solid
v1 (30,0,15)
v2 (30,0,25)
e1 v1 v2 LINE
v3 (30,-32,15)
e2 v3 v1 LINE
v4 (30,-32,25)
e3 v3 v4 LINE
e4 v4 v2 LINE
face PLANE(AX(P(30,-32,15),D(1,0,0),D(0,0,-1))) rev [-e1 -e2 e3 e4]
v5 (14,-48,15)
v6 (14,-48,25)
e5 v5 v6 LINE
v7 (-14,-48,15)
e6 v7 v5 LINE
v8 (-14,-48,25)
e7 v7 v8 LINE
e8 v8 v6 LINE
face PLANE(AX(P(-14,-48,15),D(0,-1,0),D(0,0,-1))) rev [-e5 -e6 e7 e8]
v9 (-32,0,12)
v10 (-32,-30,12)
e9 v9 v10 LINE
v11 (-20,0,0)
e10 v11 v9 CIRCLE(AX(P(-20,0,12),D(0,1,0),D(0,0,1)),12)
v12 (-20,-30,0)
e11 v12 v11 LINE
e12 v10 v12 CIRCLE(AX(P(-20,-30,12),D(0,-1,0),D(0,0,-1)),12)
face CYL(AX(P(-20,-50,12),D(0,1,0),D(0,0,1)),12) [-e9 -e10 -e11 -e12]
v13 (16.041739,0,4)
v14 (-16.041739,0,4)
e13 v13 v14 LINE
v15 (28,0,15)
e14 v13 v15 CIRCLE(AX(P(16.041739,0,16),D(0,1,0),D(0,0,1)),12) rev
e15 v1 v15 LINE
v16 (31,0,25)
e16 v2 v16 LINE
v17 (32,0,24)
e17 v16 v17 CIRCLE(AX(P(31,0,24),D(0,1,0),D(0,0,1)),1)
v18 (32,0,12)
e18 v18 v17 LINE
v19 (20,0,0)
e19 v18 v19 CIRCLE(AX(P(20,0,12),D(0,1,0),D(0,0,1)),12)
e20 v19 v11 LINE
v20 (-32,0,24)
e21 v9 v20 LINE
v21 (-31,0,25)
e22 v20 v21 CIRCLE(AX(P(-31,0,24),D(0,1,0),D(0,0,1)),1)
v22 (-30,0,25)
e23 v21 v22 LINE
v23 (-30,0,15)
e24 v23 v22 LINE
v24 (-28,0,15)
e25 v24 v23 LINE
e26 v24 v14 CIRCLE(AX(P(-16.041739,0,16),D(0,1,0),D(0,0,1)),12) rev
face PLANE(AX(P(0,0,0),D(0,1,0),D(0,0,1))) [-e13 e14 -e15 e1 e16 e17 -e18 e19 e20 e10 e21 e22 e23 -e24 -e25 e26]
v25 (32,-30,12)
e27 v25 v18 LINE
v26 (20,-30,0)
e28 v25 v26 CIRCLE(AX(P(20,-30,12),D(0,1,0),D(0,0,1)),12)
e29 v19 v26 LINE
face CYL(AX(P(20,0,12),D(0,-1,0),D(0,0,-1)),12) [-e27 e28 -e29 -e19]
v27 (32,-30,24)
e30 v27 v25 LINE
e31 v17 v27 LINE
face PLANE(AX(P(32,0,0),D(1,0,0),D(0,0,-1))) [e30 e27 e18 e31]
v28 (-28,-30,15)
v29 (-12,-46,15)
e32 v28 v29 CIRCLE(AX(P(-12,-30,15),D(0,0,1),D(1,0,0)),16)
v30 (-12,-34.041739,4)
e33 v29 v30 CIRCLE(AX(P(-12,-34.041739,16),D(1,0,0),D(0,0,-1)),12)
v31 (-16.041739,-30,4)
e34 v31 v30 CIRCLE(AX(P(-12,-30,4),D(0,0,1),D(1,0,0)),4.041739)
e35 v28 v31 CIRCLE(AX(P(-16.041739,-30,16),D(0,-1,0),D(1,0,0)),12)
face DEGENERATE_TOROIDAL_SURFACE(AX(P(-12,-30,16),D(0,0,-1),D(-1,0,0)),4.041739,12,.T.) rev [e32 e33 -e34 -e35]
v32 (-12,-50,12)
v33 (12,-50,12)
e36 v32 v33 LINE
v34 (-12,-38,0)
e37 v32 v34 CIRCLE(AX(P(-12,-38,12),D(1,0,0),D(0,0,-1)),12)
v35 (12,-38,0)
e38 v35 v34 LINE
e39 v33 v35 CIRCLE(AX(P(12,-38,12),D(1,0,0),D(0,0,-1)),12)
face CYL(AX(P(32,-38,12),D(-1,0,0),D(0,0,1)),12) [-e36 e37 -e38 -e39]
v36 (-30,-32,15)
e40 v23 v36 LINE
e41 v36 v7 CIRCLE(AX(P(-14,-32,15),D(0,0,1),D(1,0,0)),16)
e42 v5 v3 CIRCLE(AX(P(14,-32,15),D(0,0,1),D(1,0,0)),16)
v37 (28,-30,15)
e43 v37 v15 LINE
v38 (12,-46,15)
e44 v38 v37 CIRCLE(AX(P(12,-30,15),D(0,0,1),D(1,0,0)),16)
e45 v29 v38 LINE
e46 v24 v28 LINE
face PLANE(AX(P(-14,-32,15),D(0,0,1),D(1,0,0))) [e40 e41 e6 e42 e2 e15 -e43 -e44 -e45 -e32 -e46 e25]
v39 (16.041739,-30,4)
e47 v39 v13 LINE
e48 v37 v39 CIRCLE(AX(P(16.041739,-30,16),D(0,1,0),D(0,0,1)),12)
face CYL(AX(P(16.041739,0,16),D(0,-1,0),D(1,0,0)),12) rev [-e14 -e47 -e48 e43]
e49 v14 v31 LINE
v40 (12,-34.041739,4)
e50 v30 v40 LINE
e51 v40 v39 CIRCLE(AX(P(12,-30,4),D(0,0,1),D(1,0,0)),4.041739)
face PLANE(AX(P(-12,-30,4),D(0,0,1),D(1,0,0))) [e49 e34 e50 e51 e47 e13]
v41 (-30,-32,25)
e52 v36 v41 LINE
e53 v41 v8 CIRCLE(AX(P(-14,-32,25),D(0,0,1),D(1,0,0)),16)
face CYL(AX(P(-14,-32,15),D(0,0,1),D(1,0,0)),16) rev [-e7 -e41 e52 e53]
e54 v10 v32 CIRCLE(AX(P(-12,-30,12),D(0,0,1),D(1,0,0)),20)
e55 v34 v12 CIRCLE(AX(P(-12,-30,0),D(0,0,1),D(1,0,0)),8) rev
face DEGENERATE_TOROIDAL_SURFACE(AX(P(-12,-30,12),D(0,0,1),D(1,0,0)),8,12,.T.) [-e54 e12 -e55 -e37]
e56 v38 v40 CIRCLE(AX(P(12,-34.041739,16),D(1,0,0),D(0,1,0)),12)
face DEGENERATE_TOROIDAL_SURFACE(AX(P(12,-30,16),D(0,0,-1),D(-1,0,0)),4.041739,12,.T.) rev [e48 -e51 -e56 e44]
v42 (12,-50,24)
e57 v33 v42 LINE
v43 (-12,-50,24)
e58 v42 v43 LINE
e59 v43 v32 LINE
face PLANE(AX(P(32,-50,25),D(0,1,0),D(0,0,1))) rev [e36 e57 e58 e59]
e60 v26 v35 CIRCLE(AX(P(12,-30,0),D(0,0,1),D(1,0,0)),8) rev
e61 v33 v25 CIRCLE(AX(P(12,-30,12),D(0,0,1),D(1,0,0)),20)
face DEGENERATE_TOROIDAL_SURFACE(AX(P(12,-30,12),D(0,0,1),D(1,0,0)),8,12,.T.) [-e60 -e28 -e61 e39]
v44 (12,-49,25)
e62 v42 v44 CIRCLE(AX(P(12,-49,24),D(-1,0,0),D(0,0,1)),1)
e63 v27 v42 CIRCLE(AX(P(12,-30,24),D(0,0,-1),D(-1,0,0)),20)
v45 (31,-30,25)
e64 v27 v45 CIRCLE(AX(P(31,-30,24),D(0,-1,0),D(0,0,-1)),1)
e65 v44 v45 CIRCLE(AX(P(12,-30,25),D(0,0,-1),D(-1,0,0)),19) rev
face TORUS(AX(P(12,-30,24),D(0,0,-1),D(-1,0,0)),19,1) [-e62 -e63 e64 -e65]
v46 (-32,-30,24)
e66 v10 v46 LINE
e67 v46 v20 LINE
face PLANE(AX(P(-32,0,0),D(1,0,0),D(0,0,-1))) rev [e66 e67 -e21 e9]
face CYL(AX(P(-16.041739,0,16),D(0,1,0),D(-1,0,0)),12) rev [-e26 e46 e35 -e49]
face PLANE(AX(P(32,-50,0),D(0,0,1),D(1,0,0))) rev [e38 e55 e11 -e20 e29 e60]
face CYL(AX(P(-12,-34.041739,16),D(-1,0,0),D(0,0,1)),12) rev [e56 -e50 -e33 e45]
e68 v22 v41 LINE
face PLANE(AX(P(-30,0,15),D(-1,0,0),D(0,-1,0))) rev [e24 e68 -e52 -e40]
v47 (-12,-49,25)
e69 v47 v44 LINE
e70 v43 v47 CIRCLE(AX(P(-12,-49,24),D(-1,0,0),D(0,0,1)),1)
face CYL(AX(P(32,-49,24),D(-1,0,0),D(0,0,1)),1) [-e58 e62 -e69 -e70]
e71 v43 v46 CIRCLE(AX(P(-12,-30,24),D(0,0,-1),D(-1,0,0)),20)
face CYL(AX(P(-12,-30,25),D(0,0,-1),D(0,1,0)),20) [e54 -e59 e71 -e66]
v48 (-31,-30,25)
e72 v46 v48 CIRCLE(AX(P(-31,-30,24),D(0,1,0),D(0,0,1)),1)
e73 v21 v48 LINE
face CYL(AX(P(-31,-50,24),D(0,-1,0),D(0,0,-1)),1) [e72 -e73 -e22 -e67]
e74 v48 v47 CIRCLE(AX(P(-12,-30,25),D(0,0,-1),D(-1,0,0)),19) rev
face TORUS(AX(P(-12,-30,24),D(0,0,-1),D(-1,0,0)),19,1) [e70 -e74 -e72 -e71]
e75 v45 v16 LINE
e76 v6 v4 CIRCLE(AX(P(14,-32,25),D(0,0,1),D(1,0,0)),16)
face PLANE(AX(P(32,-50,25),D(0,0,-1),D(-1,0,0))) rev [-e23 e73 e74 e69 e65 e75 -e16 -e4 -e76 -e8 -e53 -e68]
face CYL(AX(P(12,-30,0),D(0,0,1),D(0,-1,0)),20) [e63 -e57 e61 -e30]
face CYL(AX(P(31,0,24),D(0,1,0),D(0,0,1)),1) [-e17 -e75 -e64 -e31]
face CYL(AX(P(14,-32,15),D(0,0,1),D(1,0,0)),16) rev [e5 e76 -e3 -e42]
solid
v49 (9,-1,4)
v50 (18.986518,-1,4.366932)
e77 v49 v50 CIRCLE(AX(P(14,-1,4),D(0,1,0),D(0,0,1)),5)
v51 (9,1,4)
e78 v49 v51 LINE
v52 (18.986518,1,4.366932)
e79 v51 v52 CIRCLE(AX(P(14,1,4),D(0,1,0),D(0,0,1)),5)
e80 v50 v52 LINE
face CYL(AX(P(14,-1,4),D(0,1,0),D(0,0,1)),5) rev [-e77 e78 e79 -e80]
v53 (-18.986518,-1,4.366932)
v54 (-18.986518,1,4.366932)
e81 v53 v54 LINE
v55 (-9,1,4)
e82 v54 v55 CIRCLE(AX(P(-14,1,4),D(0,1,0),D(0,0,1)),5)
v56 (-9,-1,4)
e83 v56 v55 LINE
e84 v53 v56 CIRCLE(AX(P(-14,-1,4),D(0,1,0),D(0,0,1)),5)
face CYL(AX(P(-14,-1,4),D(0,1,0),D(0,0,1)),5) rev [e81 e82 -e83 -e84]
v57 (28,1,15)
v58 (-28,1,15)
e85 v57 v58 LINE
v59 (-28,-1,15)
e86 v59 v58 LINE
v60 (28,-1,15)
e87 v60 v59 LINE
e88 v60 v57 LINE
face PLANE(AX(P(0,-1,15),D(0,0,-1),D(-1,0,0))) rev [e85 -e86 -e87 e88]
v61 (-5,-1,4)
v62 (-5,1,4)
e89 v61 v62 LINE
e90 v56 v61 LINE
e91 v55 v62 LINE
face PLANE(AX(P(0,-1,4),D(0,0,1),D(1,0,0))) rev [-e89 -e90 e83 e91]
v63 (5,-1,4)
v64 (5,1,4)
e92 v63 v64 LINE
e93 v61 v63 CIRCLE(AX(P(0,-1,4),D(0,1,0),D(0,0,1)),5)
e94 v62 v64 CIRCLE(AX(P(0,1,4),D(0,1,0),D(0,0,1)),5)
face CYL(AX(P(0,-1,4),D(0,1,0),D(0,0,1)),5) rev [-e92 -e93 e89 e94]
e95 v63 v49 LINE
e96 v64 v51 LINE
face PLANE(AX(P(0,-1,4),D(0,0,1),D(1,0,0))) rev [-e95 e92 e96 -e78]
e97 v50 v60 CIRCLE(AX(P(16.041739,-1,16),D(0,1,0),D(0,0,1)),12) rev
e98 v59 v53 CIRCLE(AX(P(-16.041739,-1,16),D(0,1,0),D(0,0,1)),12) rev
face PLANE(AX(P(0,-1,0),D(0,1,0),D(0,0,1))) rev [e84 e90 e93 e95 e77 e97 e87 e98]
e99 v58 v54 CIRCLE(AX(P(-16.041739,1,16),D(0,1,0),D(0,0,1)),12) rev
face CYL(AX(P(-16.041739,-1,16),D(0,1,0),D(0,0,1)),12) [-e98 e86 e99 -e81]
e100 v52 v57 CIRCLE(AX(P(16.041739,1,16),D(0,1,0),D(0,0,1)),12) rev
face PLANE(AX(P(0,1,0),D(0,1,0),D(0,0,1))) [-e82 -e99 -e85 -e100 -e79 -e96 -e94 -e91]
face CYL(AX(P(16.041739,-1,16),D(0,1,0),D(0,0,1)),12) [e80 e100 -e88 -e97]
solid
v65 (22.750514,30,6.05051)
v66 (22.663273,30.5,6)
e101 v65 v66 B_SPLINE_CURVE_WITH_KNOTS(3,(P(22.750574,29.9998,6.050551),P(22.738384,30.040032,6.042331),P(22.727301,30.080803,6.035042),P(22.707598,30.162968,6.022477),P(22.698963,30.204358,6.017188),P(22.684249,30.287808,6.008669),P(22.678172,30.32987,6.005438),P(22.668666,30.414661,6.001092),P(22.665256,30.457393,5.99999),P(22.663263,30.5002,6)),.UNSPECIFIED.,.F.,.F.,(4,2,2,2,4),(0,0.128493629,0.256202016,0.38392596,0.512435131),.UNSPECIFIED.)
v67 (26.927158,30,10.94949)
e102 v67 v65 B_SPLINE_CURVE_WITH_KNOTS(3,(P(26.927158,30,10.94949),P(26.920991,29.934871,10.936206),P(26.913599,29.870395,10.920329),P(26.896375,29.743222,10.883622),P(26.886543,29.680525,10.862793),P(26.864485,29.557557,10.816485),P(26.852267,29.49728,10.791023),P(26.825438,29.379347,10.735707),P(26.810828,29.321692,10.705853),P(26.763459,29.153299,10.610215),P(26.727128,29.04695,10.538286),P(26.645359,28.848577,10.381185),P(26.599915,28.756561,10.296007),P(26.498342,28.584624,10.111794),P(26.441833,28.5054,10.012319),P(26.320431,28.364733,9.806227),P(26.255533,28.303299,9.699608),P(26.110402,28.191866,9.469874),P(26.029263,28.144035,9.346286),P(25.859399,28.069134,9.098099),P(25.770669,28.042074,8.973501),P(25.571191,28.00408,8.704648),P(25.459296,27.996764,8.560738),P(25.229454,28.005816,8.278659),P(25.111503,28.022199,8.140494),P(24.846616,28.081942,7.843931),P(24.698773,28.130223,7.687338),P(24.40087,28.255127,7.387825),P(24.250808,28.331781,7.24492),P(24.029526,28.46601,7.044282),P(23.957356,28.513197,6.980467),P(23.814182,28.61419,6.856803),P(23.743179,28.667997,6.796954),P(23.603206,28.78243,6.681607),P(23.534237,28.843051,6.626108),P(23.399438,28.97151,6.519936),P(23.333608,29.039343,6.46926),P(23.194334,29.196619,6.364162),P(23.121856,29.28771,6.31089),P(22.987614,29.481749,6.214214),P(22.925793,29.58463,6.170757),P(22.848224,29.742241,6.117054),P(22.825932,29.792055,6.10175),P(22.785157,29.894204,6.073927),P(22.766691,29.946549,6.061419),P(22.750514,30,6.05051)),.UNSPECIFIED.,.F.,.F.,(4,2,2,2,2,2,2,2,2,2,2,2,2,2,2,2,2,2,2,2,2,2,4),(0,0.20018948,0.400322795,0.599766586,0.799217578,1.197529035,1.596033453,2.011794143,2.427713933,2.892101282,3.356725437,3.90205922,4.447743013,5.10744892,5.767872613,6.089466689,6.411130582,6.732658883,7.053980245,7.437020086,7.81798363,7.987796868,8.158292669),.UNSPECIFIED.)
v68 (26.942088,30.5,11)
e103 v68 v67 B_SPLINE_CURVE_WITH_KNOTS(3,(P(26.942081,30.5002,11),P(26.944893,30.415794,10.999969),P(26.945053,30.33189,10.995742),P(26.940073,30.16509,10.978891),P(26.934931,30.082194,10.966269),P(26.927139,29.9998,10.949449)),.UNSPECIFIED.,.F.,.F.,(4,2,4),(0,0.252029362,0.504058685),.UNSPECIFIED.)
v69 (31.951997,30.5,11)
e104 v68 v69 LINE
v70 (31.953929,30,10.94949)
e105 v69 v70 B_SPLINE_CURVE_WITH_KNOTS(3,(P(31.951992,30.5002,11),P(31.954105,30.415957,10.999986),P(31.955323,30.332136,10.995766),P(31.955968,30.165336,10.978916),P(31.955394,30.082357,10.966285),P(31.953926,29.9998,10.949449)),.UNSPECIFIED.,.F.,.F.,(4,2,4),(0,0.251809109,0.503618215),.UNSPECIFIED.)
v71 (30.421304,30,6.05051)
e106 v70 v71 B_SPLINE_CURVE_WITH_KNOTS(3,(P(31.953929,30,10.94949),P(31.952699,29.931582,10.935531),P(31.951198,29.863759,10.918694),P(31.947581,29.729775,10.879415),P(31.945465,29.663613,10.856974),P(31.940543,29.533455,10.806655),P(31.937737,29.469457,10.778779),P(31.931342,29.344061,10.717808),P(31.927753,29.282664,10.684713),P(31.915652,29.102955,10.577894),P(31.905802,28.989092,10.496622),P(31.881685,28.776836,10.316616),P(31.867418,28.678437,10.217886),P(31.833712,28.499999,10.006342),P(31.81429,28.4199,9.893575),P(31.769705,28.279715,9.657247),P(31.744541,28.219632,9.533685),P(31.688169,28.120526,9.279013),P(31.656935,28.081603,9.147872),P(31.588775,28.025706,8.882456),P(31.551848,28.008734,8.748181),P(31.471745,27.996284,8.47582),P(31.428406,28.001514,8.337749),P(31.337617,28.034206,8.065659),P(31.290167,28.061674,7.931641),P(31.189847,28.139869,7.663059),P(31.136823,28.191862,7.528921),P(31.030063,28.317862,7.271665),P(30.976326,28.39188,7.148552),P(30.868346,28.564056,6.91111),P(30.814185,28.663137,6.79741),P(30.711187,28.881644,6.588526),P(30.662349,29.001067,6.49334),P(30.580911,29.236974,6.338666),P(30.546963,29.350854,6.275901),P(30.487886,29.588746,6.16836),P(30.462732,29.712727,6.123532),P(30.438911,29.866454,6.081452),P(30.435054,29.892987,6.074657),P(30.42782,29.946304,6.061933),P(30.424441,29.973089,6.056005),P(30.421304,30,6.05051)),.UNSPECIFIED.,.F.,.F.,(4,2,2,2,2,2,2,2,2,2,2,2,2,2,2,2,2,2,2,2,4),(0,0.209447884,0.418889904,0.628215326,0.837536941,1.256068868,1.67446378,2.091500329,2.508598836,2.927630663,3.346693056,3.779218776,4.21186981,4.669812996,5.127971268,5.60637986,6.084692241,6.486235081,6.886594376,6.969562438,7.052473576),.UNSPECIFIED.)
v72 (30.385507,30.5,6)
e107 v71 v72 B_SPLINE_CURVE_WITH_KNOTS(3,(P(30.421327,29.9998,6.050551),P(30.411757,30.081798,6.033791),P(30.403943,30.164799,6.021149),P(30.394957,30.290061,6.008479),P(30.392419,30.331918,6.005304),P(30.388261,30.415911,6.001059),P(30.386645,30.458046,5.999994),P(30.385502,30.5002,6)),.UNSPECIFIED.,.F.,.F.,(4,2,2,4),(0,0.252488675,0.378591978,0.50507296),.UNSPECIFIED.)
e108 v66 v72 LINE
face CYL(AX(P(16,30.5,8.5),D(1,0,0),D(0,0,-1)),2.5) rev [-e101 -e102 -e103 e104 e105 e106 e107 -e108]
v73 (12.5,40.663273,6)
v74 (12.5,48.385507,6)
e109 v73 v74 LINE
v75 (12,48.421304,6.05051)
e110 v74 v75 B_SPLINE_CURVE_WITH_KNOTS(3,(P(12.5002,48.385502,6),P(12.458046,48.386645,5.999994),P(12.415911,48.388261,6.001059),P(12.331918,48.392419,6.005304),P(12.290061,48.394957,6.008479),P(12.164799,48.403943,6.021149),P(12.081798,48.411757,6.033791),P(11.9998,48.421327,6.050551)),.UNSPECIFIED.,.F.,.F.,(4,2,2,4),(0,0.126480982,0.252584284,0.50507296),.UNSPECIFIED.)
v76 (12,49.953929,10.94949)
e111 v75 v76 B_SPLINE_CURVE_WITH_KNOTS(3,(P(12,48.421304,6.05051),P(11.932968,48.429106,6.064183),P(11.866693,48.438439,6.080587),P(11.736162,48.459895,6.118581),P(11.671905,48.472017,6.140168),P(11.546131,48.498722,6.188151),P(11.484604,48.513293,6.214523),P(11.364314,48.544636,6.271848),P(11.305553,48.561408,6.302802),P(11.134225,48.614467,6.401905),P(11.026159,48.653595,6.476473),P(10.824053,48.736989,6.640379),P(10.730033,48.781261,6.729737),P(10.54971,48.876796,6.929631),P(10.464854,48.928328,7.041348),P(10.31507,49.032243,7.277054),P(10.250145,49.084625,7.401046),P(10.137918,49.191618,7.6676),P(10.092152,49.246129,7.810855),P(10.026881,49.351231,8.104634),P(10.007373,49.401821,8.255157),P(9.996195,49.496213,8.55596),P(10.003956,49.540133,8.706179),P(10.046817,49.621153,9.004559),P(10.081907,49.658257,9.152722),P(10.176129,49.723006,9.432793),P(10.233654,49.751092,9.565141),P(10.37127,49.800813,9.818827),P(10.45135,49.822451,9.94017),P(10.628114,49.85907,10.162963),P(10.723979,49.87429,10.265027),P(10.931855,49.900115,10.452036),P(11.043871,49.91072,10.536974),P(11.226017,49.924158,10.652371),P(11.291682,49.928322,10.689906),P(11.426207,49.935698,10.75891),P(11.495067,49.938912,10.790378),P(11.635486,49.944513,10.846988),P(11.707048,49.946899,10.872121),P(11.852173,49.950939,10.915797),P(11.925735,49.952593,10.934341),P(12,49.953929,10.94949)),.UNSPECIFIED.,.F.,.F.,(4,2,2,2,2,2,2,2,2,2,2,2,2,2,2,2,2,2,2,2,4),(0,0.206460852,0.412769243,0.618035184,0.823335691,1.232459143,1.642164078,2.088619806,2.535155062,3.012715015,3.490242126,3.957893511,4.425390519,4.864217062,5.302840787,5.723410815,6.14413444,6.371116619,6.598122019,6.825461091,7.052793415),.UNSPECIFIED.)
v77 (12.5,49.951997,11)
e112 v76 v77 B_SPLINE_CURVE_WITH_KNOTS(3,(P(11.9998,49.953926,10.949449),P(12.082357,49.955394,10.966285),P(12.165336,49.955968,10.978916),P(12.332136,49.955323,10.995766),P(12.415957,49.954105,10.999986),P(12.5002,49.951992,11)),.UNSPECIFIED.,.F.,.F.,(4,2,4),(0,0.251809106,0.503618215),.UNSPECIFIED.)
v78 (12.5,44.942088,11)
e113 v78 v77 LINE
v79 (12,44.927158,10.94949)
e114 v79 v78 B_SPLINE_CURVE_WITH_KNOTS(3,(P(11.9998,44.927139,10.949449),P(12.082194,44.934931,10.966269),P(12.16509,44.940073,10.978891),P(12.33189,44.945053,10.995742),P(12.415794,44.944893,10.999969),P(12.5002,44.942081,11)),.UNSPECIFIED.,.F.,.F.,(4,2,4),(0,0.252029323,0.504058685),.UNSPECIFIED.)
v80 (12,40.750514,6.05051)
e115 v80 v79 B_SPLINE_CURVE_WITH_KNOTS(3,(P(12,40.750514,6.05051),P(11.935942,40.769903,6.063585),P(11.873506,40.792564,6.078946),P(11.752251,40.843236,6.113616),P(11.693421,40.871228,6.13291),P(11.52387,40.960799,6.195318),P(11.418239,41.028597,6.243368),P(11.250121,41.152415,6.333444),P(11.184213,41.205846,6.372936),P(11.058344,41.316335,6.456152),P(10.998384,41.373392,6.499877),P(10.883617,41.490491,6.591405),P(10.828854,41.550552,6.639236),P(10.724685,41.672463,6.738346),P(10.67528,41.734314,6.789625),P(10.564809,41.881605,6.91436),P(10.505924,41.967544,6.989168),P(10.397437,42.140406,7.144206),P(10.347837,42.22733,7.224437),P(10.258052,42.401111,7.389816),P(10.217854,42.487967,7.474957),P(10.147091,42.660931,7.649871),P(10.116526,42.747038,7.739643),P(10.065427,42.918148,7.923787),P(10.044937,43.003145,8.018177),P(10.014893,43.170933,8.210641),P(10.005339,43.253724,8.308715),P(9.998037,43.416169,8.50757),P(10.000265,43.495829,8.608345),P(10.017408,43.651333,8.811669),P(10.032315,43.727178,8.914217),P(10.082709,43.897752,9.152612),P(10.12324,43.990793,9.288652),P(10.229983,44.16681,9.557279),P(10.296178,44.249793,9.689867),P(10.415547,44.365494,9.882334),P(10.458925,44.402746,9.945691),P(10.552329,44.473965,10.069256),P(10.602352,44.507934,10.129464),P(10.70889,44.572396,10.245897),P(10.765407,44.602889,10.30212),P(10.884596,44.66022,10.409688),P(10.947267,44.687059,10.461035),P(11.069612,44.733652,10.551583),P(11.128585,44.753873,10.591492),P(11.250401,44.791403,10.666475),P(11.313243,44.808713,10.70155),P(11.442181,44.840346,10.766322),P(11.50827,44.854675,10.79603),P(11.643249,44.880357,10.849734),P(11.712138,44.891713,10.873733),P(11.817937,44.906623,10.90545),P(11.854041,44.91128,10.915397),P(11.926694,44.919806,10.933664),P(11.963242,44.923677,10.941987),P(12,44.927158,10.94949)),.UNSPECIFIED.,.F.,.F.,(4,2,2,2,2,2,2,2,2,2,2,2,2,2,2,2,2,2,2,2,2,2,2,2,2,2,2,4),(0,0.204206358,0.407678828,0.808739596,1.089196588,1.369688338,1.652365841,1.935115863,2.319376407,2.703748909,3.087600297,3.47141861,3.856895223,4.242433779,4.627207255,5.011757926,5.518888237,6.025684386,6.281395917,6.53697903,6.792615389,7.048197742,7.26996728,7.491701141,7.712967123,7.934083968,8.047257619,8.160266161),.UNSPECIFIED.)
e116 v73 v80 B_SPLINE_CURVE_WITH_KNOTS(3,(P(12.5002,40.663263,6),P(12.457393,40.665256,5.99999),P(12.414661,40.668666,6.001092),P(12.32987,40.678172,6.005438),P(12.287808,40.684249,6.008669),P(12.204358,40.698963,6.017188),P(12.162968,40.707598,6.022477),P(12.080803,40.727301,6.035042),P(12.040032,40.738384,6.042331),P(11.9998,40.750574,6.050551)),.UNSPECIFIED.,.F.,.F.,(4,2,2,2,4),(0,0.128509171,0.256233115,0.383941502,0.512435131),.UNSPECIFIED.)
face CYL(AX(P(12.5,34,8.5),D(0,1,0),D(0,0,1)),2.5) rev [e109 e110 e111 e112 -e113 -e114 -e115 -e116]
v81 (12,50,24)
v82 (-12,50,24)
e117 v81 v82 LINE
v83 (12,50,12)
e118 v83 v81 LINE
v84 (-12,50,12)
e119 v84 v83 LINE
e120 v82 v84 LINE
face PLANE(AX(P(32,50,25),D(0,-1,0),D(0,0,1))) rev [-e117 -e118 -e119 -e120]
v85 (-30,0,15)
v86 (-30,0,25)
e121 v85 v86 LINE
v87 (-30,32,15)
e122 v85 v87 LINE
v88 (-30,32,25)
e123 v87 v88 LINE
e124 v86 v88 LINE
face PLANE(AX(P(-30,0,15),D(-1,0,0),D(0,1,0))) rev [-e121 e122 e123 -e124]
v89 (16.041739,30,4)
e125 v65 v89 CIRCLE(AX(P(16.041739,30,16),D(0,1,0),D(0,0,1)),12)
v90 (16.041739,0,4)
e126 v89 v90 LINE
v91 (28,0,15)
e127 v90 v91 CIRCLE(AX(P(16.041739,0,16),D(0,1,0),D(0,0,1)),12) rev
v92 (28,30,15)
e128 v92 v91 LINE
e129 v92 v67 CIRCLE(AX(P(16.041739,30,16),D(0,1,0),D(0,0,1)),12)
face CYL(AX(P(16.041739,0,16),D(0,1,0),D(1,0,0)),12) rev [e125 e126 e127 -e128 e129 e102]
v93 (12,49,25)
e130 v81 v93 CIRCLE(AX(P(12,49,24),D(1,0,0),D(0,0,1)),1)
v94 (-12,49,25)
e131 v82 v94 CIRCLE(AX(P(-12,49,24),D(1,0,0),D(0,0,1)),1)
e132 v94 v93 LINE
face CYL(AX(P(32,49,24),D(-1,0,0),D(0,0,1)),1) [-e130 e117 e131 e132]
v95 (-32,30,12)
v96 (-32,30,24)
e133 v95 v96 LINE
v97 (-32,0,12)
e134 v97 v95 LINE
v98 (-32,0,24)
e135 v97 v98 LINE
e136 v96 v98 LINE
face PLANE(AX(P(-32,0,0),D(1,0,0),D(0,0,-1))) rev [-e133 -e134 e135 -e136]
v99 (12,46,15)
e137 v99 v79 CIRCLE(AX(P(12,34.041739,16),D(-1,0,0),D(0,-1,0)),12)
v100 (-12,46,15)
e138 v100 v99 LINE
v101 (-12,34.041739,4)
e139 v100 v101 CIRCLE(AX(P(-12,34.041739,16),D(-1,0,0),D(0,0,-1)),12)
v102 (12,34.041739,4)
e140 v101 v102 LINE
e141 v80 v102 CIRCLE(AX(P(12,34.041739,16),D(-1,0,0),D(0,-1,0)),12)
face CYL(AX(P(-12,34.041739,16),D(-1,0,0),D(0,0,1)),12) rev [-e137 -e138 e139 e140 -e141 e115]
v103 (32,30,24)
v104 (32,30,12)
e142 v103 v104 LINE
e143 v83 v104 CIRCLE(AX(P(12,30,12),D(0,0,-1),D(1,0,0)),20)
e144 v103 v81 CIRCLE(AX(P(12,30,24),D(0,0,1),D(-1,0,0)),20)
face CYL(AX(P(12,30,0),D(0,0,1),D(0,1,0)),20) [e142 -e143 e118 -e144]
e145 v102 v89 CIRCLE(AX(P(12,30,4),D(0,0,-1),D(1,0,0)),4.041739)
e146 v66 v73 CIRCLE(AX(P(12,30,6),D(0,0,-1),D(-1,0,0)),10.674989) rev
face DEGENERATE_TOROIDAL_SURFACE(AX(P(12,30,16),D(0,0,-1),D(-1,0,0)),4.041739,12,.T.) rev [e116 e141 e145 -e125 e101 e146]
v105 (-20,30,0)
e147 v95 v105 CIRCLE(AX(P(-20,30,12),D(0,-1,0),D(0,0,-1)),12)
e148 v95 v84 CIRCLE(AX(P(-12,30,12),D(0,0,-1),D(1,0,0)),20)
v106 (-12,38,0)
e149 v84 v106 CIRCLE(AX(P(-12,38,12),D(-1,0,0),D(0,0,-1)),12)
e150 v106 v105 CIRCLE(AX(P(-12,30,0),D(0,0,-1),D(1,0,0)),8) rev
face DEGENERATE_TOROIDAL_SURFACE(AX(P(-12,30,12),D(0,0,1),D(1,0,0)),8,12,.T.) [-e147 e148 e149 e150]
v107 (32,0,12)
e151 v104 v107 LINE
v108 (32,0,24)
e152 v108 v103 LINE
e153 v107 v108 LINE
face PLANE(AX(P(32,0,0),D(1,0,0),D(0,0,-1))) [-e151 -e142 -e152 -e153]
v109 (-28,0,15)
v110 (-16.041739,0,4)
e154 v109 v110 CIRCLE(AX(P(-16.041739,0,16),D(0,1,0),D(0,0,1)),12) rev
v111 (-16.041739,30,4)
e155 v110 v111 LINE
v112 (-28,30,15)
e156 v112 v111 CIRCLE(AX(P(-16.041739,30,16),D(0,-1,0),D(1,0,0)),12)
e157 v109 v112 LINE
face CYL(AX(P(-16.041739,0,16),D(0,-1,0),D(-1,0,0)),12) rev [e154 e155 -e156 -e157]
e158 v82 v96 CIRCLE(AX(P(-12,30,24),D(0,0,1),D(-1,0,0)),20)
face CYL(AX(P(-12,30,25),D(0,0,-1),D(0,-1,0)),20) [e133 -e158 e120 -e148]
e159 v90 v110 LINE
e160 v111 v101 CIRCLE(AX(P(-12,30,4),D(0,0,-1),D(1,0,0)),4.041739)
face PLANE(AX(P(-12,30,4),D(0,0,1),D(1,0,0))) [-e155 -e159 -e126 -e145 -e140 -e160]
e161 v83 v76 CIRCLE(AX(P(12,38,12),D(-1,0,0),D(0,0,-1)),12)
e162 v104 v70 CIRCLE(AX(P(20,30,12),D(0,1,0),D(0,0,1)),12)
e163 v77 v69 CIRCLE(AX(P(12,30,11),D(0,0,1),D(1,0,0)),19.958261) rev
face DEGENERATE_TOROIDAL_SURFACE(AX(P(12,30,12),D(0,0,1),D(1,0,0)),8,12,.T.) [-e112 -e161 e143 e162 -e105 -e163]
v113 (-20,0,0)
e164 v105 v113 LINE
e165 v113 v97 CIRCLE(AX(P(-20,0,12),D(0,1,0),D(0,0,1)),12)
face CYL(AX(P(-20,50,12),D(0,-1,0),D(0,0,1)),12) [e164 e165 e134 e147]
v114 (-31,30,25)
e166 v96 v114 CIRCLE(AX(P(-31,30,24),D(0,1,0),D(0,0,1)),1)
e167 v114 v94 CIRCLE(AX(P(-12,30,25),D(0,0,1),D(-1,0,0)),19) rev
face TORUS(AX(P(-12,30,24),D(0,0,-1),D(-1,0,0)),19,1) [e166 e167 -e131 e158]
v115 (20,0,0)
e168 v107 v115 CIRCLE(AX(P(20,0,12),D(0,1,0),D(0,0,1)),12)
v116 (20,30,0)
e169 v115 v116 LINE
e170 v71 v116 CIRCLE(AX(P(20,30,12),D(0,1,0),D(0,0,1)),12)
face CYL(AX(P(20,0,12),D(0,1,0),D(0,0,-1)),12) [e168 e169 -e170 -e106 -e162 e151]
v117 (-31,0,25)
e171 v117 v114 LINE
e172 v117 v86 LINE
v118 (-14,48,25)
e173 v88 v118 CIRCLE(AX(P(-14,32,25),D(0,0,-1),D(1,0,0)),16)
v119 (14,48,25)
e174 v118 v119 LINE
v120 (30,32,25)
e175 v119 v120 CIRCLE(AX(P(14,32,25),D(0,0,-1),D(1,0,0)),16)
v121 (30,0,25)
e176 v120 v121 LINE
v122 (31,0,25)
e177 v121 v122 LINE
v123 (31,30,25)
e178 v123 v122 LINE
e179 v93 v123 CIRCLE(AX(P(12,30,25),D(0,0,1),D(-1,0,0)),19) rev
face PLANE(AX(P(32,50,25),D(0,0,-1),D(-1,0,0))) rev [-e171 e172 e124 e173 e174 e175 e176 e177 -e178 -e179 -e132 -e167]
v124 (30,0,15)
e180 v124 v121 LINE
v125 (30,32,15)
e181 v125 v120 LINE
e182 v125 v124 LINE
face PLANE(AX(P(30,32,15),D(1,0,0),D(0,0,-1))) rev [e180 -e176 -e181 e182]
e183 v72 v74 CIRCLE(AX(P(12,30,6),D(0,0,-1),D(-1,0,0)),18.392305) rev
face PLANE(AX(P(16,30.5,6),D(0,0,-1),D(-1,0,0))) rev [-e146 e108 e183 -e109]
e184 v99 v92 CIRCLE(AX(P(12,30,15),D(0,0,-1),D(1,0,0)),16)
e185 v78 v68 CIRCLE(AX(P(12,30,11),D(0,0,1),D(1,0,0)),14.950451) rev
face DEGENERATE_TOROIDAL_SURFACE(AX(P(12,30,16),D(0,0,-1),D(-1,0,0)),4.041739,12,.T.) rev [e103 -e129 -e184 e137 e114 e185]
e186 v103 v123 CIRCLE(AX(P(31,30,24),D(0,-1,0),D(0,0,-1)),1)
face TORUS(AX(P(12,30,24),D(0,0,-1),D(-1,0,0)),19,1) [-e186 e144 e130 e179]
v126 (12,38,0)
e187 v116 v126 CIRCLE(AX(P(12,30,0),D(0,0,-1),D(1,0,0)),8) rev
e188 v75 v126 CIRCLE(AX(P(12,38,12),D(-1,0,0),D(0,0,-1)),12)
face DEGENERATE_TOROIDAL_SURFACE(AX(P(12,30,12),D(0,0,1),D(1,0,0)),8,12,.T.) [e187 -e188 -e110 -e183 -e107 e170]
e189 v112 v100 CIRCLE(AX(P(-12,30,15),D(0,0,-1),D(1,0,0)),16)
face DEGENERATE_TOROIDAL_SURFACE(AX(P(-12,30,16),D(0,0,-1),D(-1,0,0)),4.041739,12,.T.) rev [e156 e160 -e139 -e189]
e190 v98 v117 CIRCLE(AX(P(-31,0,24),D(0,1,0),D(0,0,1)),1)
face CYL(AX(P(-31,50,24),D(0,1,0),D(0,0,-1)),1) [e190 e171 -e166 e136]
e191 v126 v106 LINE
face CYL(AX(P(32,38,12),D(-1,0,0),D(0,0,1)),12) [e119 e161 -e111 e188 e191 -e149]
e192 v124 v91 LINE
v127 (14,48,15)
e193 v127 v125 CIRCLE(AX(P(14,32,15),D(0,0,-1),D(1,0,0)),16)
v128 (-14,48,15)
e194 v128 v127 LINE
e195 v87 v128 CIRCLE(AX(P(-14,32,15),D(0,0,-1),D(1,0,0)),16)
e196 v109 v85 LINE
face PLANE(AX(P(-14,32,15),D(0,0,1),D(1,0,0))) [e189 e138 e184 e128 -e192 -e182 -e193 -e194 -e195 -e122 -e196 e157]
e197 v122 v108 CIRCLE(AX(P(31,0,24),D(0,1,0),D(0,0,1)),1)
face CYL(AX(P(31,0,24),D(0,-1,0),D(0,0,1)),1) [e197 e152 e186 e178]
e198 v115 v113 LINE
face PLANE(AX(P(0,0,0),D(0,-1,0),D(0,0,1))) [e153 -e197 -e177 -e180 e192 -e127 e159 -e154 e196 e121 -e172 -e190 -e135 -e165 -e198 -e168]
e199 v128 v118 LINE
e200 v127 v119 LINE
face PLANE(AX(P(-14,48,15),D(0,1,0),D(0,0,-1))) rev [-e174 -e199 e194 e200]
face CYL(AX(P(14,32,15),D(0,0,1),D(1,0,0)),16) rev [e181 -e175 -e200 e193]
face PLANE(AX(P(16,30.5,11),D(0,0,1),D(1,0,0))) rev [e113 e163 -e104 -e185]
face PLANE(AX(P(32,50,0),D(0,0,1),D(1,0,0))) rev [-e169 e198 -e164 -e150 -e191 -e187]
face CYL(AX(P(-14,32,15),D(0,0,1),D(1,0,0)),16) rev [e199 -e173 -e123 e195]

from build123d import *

# Parameters (mm, degrees)
SKETCH2_W           = 100
SKETCH2_H           = 25
BOSS_EXTRUDE3_DEPTH = 32
CUT_EXTRUDE1_DEPTH  = 10
CUT_EXTRUDE2_DEPTH  = 11
FILLET1_R           = 12
FILLET2_R           = 20
FILLET3_R           = 12
FILLET13_R          = 1
BOSS_EXTRUDE4_DEPTH = 1
CUT_EXTRUDE3_DEPTH  = 16
CUT_EXTRUDE4_DEPTH  = 16


with BuildPart() as part:
    # Sketch2 → Boss-Extrude3 (new, symmetric)
    with BuildSketch(Plane.YZ):
        with Locations((0, 12.5)):
            Rectangle(SKETCH2_W, SKETCH2_H)
    extrude(amount=BOSS_EXTRUDE3_DEPTH, both=True)

    # Sketch3 → Cut-Extrude1 (cut)
    with BuildSketch(Plane.XY.offset(25)):
        with BuildLine():
            Line((-30, 0), (-30, -32))
            ThreePointArc((-30, -32), (-25.313708499, -43.313708499), (-14, -48))
            Line((-14, -48), (14, -48))
            ThreePointArc((14, -48), (25.313708499, -43.313708499), (30, -32))
            Line((30, -32), (30, 0))
            Line((30, 0), (-30, 0))
        make_face()
    extrude(amount=-CUT_EXTRUDE1_DEPTH, mode=Mode.SUBTRACT)

    # Sketch4 → Cut-Extrude2 (cut)
    with BuildSketch(Plane.XY.offset(15)):
        with BuildLine():
            Line((-28, 0), (28, 0))
            Line((28, 0), (28, -30))
            ThreePointArc((28, -30), (23.313708499, -41.313708499), (12, -46))
            Line((12, -46), (-12, -46))
            ThreePointArc((-12, -46), (-23.313708499, -41.313708499), (-28, -30))
            Line((-28, -30), (-28, 0))
        make_face()
    extrude(amount=-CUT_EXTRUDE2_DEPTH, mode=Mode.SUBTRACT)

    # SurfaceCut2
    split(bisect_by=Plane(origin=(0, 0, 0), x_dir=(-1, 0, 0), z_dir=(0, 1, 0)), keep=Keep.BOTTOM)

    # Fillet1
    # the kernel refuses this fillet: 12 mm, written as the material it adds along each edge
    with BuildSketch(Plane(origin=(-28, -30, 4), x_dir=(1, 0, 0), z_dir=(0, 1, 0))) as fillet1_piece_1:
        with BuildLine():
            CenterArc((11.958260743, -12), FILLET1_R, 90, 85.219808153)
            Line((0, -11), (-0.239165215, -10.98))
            ThreePointArc((-0.239165215, -10.98), (-0.24, -5.5), (-0.24, 0))
            Line((-0.24, 0), (0, 0.24))
            Line((0, 0.24), (11.958260743, 0.24))
            Line((11.958260743, 0.24), (11.958260743, 0))
        make_face()
    extrude(amount=30)
    with BuildSketch(Plane(origin=(28, 0, 4), x_dir=(0, 0, 1), z_dir=(0, -1, 0))) as fillet1_piece_2:
        with BuildLine():
            CenterArc((12, 11.958260743), FILLET1_R, 180, 85.219808153)
            Line((0, 11.958260743), (-0.24, 11.958260743))
            Line((-0.24, 11.958260743), (-0.24, 0))
            Line((-0.24, 0), (0, -0.24))
            ThreePointArc((0, -0.24), (5.5, -0.24), (10.98, -0.239165215))
            Line((10.98, -0.239165215), (11, 0))
        make_face()
    extrude(amount=30)
    with BuildSketch(Plane(origin=(12, -30, 4), x_dir=(1, 0, 0), z_dir=(0, 1, 0))) as fillet1_piece_3:
        with BuildLine():
            CenterArc((4.041739257, -12), FILLET1_R, 4.780191847, 85.219808153)
            Line((16, -11), (16.239165215, -10.98))
            ThreePointArc((16.239165215, -10.98), (16.24, -5.5), (16.24, 0))
            Line((16.24, 0), (16, 0.24))
            Line((16, 0.24), (4.041739257, 0.24))
            Line((4.041739257, 0.24), (4.041739257, 0))
        make_face()
    revolve(axis=Axis((12, -30, 4), (0, 0, -1)), revolution_arc=90)
    with BuildSketch(Plane(origin=(12, -46, 4), x_dir=(0, 1, 0), z_dir=(-1, 0, 0))) as fillet1_piece_4:
        with BuildLine():
            CenterArc((11.958260743, -12), FILLET1_R, 90, 85.219808153)
            Line((0, -11), (-0.239165215, -10.98))
            ThreePointArc((-0.239165215, -10.98), (-0.24, -5.5), (-0.24, 0))
            Line((-0.24, 0), (0, 0.24))
            Line((0, 0.24), (11.958260743, 0.24))
            Line((11.958260743, 0.24), (11.958260743, 0))
        make_face()
    extrude(amount=24)
    with BuildSketch(Plane(origin=(-12, -30, 4), x_dir=(0, -1, 0), z_dir=(1, 0, 0))) as fillet1_piece_5:
        with BuildLine():
            CenterArc((4.041739257, -12), FILLET1_R, 4.780191847, 85.219808153)
            Line((16, -11), (16.239165215, -10.98))
            ThreePointArc((16.239165215, -10.98), (16.24, -5.5), (16.24, 0))
            Line((16.24, 0), (16, 0.24))
            Line((16, 0.24), (4.041739257, 0.24))
            Line((4.041739257, 0.24), (4.041739257, 0))
        make_face()
    revolve(axis=Axis((-12, -30, 4), (0, 0, -1)), revolution_arc=90)

    # Fillet2
    fillet2_edges = [part.edges().sort_by_distance(p)[0] for p in [
        (32, -50, 12.5),
        (-32, -50, 12.5),
    ]]
    fillet(fillet2_edges, radius=FILLET2_R)

    # Fillet3
    fillet3_edges = [part.edges().sort_by_distance(p)[0] for p in [
        (0, -50, 0),
        (32, -15, 0),
        (-32, -15, 0),
        (26.142135624, -44.142135624, 0),
        (-26.142135624, -44.142135624, 0),
    ]]
    fillet(fillet3_edges, radius=FILLET3_R)

    # Fillet13
    fillet13_edges = [part.edges().sort_by_distance(p)[0] for p in [
        (-32, -15, 25),
        (32, -15, 25),
        (0, -50, 25),
        (26.142135624, -44.142135624, 25),
        (-26.142135624, -44.142135624, 25),
    ]]
    fillet(fillet13_edges, radius=FILLET13_R)


with BuildPart() as body_2:
    # Sketch7 → Boss-Extrude4 (new, symmetric)
    with BuildSketch(Plane(origin=(0, 0, 0), x_dir=(-1, 0, 0), z_dir=(0, 1, 0))):
        with BuildLine():
            ThreePointArc((-24.165777662, 7.168239134), (-21.750636592, 5.444977915), (-18.986517938, 4.366931681))
            ThreePointArc((-18.986517938, 4.366931681), (-13.81641036, 8.996628348), (-9, 4))
            Line((-9, 4), (-5, 4))
            ThreePointArc((-5, 4), (0, 9), (5, 4))
            Line((5, 4), (9, 4))
            ThreePointArc((9, 4), (13.81641036, 8.996628348), (18.986517938, 4.366931681))
            ThreePointArc((18.986517938, 4.366931681), (25.195464263, 8.240533619), (28, 15))
            Line((28, 15), (-28, 15))
            ThreePointArc((-28, 15), (-26.819438656, 10.723524314), (-24.165777662, 7.168239134))
        make_face()
    extrude(amount=BOSS_EXTRUDE4_DEPTH, both=True)


with BuildPart() as body_3:
    # Mirror2: read off the stored shape, not the designer's step
    # Mirror2: mirrored copy
    add(part.part.mirror(Plane(origin=(0, 0, 0), x_dir=(1, 0, 0), z_dir=(0, 1, 0))))

    # Sketch9 → Cut-Extrude3 (cut)
    with BuildSketch(Plane.YZ.offset(32)):
        with BuildLine():
            Line((30.5, 11), (54.187598308, 11))
            ThreePointArc((54.187598308, 11), (56.687598308, 8.5), (54.187598308, 6))
            Line((54.187598308, 6), (30.5, 6))
            ThreePointArc((30.5, 6), (28, 8.5), (30.5, 11))
        make_face()
    extrude(amount=-CUT_EXTRUDE3_DEPTH, mode=Mode.SUBTRACT)

    # Sketch10 → Cut-Extrude4 (cut)
    with BuildSketch(Plane(origin=(0, 50, 0), x_dir=(-1, 0, 0), z_dir=(0, 1, 0))):
        with BuildLine():
            Line((-30.093221435, 11), (-12.5, 11))
            ThreePointArc((-12.5, 11), (-10, 8.5), (-12.5, 6))
            Line((-12.5, 6), (-30.093221435, 6))
            ThreePointArc((-30.093221435, 6), (-32.593221435, 8.5), (-30.093221435, 11))
        make_face()
    extrude(amount=-CUT_EXTRUDE4_DEPTH, mode=Mode.SUBTRACT)


solid = Compound([part.part, body_2.part, body_3.part])
